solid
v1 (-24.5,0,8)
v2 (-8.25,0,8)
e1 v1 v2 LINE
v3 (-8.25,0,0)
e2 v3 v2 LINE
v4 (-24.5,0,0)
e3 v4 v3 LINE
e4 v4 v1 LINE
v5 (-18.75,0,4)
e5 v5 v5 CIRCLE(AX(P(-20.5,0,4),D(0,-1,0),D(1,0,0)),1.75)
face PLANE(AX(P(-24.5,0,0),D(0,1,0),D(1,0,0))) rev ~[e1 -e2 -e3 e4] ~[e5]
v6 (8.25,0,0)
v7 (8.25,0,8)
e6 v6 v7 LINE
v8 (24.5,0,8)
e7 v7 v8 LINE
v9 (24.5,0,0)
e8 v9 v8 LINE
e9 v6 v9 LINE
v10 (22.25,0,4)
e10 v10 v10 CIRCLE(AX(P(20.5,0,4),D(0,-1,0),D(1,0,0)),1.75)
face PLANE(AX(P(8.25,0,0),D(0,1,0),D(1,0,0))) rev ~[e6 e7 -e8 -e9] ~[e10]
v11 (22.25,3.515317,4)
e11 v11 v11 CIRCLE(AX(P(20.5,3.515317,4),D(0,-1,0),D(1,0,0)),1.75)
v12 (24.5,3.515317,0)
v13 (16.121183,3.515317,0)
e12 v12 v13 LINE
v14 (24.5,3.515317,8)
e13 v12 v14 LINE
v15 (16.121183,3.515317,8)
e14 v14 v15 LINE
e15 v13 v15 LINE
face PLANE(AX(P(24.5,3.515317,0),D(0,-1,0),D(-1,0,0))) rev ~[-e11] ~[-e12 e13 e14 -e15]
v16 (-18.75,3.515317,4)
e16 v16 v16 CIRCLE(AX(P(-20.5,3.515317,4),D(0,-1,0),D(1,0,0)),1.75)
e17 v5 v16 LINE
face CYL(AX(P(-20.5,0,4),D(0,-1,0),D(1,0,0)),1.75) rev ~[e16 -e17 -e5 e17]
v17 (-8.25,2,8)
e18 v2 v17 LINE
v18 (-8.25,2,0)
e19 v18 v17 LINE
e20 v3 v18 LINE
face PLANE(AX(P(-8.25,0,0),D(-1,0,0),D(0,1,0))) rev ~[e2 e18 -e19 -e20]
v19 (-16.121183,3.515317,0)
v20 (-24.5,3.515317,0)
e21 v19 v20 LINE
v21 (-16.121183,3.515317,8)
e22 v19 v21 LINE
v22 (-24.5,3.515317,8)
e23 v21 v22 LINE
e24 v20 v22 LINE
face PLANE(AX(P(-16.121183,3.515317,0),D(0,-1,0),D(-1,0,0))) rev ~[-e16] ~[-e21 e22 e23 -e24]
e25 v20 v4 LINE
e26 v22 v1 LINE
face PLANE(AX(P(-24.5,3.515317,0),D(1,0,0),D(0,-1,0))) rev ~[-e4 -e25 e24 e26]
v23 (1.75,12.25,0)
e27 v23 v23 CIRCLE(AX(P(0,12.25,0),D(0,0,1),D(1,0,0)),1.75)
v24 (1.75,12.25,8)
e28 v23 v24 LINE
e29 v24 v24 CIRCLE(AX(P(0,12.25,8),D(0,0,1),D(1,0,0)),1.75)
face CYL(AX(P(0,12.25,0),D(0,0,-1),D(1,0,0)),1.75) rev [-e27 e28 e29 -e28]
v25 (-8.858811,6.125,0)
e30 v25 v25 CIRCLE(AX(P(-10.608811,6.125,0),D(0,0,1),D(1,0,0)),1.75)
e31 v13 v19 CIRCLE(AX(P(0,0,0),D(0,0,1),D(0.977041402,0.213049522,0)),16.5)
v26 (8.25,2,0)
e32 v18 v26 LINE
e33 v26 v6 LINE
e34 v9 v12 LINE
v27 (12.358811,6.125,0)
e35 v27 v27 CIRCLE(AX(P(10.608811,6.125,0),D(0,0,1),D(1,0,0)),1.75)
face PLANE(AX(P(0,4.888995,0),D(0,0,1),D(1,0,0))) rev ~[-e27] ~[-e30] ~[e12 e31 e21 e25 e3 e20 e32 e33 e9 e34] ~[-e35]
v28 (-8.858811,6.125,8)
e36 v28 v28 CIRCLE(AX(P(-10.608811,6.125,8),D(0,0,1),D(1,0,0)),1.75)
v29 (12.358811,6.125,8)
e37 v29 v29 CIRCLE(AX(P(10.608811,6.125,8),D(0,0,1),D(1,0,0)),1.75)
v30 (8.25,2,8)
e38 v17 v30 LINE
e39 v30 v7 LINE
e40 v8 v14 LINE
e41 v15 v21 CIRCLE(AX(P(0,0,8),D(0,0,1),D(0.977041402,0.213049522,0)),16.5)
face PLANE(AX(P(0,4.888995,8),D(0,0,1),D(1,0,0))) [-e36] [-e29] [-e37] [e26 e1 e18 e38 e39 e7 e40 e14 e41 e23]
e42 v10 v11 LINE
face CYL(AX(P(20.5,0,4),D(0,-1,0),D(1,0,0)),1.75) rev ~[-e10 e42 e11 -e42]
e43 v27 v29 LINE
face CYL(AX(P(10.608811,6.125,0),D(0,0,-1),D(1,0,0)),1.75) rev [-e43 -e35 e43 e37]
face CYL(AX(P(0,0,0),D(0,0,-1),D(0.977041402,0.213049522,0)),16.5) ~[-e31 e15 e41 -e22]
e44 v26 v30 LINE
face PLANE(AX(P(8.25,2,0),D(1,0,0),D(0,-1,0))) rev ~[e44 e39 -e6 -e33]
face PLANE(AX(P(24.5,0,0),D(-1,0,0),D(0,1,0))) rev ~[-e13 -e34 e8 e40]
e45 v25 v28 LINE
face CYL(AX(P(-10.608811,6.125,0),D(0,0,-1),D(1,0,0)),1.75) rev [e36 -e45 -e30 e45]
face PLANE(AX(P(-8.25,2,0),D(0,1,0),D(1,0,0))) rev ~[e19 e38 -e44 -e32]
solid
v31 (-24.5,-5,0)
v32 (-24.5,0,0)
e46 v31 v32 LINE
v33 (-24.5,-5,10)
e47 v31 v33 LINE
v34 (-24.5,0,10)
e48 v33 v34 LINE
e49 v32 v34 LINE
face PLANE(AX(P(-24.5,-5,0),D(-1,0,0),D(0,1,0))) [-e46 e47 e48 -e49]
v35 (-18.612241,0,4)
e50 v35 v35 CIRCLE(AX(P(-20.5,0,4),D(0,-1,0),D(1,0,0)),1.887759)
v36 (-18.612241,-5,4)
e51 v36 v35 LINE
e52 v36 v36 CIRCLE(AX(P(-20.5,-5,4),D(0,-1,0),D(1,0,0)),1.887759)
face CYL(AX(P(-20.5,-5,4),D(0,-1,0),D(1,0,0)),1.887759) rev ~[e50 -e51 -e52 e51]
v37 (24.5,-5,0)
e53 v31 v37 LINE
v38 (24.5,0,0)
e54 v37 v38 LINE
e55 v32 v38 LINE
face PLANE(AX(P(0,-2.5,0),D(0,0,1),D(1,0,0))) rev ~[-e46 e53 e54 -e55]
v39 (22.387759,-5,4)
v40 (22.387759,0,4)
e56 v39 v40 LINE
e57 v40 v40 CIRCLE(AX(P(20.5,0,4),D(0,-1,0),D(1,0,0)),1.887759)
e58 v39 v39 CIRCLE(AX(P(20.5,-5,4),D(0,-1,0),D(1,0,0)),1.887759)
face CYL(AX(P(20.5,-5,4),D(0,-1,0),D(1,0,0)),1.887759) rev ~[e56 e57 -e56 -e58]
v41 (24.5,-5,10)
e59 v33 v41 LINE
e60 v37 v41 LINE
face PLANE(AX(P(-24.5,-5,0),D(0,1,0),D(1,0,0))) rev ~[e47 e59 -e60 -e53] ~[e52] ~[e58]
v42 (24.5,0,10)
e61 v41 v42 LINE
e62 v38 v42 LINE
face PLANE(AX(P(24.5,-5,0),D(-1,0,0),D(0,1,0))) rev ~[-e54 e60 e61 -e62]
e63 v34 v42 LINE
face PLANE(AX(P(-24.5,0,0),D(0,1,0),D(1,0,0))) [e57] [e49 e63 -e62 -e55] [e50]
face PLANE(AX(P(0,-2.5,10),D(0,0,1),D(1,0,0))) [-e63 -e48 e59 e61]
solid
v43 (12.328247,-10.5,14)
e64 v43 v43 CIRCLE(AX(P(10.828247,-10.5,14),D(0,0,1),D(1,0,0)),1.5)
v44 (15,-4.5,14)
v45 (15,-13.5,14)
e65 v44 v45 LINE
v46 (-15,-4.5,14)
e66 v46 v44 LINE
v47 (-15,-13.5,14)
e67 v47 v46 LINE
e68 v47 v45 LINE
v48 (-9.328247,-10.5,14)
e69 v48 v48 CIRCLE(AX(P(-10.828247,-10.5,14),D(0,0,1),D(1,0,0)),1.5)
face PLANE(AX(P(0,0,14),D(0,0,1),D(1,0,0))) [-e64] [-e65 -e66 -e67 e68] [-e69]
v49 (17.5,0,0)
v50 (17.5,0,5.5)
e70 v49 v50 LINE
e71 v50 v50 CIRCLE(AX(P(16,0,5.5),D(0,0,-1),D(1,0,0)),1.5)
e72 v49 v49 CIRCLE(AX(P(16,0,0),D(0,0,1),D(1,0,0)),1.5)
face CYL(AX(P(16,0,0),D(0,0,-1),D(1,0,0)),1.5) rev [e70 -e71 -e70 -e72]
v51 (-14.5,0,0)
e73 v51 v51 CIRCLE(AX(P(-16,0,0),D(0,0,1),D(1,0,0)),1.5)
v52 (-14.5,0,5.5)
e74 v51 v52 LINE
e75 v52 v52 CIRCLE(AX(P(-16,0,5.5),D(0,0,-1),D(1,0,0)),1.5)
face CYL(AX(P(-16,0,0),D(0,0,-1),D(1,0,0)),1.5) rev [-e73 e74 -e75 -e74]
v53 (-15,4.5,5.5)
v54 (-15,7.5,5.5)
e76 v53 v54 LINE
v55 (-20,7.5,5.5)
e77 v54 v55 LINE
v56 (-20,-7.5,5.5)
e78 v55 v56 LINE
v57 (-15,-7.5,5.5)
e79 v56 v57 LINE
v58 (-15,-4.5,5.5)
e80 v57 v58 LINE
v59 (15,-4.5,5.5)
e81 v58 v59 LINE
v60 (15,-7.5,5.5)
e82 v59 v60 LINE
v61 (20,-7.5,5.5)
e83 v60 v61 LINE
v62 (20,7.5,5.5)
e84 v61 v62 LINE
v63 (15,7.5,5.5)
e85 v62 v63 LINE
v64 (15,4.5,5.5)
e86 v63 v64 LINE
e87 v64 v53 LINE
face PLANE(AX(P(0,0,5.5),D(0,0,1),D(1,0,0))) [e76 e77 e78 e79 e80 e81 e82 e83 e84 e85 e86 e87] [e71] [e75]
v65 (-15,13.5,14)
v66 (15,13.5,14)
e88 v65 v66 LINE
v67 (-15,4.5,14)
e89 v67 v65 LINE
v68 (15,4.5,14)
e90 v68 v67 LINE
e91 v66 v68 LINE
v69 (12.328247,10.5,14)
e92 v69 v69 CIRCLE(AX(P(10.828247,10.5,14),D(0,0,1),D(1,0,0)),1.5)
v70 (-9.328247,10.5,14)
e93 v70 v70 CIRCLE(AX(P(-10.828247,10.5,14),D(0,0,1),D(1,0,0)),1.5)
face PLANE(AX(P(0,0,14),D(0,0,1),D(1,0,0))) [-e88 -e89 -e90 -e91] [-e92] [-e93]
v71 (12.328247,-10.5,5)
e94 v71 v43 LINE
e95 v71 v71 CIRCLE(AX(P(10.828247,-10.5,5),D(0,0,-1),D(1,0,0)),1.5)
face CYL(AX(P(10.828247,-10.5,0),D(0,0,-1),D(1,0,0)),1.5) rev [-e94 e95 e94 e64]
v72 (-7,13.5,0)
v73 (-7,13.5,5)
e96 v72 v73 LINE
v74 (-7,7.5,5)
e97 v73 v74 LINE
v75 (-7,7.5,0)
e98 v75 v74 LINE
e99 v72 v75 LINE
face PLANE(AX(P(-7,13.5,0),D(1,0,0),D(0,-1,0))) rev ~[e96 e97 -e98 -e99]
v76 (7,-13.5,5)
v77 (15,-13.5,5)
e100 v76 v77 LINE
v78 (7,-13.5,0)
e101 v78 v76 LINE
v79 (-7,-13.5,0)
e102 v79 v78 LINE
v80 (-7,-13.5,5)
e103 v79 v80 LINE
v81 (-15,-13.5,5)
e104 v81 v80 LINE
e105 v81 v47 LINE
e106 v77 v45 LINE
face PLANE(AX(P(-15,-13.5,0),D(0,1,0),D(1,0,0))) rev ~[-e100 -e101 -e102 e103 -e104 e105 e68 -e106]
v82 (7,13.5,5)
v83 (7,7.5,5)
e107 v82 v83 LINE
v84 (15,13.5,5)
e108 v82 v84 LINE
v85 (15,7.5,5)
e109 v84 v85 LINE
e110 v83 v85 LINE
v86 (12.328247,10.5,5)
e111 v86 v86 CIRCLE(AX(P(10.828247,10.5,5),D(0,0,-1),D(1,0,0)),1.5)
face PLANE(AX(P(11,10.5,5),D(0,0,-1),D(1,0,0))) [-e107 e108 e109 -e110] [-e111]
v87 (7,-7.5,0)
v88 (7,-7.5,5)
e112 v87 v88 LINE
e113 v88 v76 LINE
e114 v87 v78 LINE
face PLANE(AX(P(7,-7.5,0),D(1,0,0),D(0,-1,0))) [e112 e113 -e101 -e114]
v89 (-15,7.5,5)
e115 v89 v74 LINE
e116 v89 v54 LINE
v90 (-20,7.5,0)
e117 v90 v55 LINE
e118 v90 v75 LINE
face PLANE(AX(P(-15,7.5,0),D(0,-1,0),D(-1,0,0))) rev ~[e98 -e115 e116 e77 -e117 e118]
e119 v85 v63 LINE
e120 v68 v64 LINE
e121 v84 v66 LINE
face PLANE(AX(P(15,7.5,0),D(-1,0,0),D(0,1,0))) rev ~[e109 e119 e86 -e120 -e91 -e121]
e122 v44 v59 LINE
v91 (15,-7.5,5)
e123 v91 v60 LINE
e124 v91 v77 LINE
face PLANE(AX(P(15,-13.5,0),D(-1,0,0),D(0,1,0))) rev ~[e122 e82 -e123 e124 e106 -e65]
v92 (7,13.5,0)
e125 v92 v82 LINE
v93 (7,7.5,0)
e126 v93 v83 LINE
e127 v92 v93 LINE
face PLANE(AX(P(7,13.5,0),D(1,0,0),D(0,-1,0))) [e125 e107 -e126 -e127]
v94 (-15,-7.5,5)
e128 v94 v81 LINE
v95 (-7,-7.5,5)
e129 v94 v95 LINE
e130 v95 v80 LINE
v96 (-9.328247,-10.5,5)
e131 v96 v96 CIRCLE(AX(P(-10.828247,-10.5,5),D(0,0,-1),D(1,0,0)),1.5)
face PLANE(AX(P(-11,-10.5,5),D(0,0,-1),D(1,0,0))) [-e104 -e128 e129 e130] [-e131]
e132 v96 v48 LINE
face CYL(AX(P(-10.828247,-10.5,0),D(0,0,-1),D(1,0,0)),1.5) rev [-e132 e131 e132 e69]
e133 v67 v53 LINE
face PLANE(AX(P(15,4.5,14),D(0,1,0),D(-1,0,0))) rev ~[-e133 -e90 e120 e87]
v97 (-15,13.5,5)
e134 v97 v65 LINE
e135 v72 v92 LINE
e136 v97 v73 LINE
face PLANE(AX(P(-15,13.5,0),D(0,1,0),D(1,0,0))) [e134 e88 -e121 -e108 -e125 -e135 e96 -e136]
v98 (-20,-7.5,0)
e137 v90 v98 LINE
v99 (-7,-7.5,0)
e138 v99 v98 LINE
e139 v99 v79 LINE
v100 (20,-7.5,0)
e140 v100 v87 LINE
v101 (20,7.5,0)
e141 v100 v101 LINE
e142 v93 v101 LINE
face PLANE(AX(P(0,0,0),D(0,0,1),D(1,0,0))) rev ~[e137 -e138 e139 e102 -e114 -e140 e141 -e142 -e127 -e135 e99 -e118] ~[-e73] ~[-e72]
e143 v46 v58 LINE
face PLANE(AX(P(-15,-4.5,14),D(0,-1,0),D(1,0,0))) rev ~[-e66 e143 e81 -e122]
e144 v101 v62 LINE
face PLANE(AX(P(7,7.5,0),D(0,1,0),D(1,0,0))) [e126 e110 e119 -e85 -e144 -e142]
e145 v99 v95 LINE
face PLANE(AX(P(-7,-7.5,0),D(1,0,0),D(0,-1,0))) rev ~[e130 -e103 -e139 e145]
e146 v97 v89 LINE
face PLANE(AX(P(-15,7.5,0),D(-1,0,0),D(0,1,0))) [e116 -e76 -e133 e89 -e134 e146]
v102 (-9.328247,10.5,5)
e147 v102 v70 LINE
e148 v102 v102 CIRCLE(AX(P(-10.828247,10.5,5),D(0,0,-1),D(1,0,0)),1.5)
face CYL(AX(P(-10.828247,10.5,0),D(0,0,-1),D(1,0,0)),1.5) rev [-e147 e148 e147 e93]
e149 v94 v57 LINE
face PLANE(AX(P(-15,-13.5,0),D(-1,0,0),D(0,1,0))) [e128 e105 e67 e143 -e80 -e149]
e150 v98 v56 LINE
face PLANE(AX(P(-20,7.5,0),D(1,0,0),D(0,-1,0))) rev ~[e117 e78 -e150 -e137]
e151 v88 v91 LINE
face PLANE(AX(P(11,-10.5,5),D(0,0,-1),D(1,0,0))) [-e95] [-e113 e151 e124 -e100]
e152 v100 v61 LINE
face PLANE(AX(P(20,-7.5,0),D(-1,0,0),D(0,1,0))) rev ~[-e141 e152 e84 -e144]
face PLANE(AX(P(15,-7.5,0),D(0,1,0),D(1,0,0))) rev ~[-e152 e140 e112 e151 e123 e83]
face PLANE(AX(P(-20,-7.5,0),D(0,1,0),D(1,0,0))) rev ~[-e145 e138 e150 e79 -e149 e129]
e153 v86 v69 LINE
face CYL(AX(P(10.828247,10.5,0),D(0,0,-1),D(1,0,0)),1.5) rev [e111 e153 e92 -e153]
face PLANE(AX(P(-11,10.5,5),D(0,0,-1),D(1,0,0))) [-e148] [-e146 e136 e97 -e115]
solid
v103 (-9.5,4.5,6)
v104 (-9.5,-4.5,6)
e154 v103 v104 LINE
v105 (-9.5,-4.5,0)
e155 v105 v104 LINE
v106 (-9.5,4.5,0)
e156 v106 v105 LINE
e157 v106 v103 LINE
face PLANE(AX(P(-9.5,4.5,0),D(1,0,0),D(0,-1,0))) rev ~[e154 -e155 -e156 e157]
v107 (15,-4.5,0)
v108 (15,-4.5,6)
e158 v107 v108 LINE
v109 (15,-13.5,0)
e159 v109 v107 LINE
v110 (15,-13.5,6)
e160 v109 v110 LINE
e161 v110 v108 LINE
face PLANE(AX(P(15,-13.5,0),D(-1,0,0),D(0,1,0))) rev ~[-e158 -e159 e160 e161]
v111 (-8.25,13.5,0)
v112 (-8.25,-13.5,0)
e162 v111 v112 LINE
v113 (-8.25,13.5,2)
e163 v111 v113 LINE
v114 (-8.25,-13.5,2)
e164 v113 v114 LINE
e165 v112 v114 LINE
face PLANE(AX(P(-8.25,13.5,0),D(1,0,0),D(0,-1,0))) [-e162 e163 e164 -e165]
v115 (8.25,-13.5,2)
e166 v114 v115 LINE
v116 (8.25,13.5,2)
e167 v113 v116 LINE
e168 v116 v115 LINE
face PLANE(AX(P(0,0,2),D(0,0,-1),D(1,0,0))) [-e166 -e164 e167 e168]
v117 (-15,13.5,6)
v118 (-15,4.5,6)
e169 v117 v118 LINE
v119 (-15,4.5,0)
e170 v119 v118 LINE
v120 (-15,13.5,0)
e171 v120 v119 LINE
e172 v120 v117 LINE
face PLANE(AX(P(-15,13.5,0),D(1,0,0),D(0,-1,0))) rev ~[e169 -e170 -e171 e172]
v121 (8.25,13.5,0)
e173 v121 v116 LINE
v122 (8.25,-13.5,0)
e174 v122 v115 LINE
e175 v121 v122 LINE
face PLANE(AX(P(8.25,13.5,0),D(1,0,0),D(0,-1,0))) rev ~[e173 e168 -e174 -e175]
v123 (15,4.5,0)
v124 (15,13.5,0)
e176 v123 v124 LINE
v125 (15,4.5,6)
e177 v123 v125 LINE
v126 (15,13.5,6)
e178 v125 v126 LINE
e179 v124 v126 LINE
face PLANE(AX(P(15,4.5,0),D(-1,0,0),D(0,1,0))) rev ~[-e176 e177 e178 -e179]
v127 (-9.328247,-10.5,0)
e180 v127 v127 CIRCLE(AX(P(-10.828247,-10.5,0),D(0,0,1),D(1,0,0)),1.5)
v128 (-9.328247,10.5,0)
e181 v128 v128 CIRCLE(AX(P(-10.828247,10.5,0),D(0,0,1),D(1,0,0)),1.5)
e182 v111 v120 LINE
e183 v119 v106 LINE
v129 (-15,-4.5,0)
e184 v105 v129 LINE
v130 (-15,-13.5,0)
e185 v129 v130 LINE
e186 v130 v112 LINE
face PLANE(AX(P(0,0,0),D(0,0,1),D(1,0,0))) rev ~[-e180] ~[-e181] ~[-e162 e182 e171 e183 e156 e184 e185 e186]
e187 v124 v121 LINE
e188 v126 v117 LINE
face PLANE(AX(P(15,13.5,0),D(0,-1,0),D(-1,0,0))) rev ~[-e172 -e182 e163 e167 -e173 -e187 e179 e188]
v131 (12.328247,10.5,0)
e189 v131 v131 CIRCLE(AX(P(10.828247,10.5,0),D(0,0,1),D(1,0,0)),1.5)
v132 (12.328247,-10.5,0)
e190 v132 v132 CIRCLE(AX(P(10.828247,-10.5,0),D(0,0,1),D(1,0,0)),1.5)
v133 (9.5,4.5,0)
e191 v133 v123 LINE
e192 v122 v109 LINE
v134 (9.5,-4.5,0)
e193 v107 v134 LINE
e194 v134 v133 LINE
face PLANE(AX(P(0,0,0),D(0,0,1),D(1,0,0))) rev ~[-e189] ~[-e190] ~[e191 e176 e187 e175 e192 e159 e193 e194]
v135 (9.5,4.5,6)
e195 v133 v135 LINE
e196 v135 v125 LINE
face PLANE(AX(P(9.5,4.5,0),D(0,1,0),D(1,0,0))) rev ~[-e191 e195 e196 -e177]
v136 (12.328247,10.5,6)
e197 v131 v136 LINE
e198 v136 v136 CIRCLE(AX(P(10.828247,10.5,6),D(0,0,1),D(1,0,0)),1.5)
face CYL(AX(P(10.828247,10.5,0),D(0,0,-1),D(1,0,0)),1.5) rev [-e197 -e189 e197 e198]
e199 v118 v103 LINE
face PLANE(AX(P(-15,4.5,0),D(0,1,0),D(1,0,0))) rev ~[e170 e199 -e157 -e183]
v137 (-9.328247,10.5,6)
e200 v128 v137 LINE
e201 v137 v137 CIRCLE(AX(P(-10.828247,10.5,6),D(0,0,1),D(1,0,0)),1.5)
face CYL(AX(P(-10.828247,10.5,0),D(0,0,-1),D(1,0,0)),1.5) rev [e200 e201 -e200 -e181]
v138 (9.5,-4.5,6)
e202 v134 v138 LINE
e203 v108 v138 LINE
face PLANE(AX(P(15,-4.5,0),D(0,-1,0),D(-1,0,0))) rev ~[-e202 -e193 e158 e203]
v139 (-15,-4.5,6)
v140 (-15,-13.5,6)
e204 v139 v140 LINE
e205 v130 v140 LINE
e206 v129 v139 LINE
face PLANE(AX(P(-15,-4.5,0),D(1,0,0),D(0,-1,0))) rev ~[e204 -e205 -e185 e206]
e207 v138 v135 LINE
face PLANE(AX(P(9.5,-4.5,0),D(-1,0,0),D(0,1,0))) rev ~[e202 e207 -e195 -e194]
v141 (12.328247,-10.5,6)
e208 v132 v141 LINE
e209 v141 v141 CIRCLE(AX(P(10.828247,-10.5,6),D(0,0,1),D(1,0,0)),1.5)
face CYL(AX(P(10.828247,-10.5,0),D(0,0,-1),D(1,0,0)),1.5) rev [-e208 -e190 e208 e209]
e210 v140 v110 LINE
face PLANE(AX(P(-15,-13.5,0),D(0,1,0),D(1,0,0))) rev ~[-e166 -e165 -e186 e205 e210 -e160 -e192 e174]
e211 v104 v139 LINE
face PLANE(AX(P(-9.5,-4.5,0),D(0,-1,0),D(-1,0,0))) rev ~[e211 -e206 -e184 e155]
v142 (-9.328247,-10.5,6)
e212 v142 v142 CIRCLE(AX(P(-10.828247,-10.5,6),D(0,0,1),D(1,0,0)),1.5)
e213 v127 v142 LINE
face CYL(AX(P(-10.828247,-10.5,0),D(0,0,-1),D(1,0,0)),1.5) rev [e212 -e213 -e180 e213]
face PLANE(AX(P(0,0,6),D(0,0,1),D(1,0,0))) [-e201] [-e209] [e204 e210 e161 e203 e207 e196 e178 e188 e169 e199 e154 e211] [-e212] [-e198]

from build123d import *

# Parameters (mm, degrees)
F0_R      = 1.5
F0_W      = 30
F0_H      = 6
F1_DEPTH  = 14
F3_DEPTH  = 8.5
F4_R      = 1.5
F5_DEPTH  = 6
F6_W      = 16.5
F6_H      = 27
F7_DEPTH  = 2
F8_W      = 8
F8_H      = 6
F9_DEPTH  = 5
F10_R     = 1.75
F11_DEPTH = 8
F12_R     = 1.75
F13_DEPTH = 25
F14_W     = 49
F14_H     = 5
F15_DEPTH = 10
F16_R     = 1.8877590654
F17_DEPTH = 8


with BuildPart() as f1:
    # F0 (on Top) → F1 (new body)
    with BuildSketch(Plane.XY):
        Polygon((-15, 7.5), (-20, 7.5), (-20, -7.5), (-15, -7.5), (15, -7.5), (20, -7.5), (20, 7.5), (15, 7.5), align=None)
        with Locations((-16, 0)):
            Circle(F0_R, mode=Mode.SUBTRACT)
        with Locations((16, 0)):
            Circle(F0_R, mode=Mode.SUBTRACT)
        with Locations((0, 10.5)):
            Rectangle(F0_W, F0_H)
        with Locations((-10.828246883, 10.5)):
            Circle(F0_R, mode=Mode.SUBTRACT)
        with Locations((10.828246883, 10.5)):
            Circle(F0_R, mode=Mode.SUBTRACT)
        with Locations((0, -10.5)):
            Rectangle(F0_W, F0_H)
        with Locations((-10.828246883, -10.5)):
            Circle(F0_R, mode=Mode.SUBTRACT)
        with Locations((10.828246883, -10.5)):
            Circle(F0_R, mode=Mode.SUBTRACT)
    extrude(amount=F1_DEPTH)

    # F2 (on face) → F3 (cut)
    with BuildSketch(Plane.XY.offset(14)):
        Polygon((15, 4.5), (-15, 4.5), (-15, 7.5), (-20, 7.5), (-20, 4.5), (-20, -4.5), (-20, -7.5), (-15, -7.5), (-15, -4.5), (15, -4.5), (15, -7.5), (20, -7.5), (20, -4.5), (20, 4.5), (20, 7.5), (15, 7.5), align=None)
    extrude(amount=-F3_DEPTH, mode=Mode.SUBTRACT)

    # F8 (on face) → F9 (cut)
    with BuildSketch(Plane(origin=(0, 0, 0), x_dir=(1, 0, 0), z_dir=(0, 0, -1))):
        with Locations((-11, 10.5)):
            Rectangle(F8_W, F8_H)
        with Locations((11, 10.5)):
            Rectangle(F8_W, F8_H)
        with Locations((-11, -10.5)):
            Rectangle(F8_W, F8_H)
        with Locations((11, -10.5)):
            Rectangle(F8_W, F8_H)
    extrude(amount=-F9_DEPTH, mode=Mode.SUBTRACT)


with BuildPart() as f5:
    # F4 (on Top) → F5 (new body)
    with BuildSketch(Plane.XY):
        Polygon((15, 13.5), (-15, 13.5), (-15, 4.5), (-9.5, 4.5), (-9.5, -4.5), (-15, -4.5), (-15, -13.5), (15, -13.5), (15, -4.5), (9.5, -4.5), (9.5, 4.5), (15, 4.5), align=None)
        with Locations((-10.828246883, -10.5)):
            Circle(F4_R, mode=Mode.SUBTRACT)
        with Locations((10.828246883, -10.5)):
            Circle(F4_R, mode=Mode.SUBTRACT)
        with Locations((-10.828246883, 10.5)):
            Circle(F4_R, mode=Mode.SUBTRACT)
        with Locations((10.828246883, 10.5)):
            Circle(F4_R, mode=Mode.SUBTRACT)
    extrude(amount=F5_DEPTH)

    # F6 (on face) → F7 (cut)
    with BuildSketch(Plane(origin=(0, 0, 0), x_dir=(1, 0, 0), z_dir=(0, 0, -1))):
        Rectangle(F6_W, F6_H)
    extrude(amount=-F7_DEPTH, mode=Mode.SUBTRACT)


with BuildPart() as f11:
    # F10 (on Top) → F11 (new body)
    with BuildSketch(Plane.XY):
        with BuildLine():
            Line((-24.5, 0), (-16.5, 0))
            Line((-16.5, 0), (-8.25, 0))
            Line((-8.25, 0), (-8.25, 2))
            Line((-8.25, 2), (8.25, 2))
            Line((8.25, 2), (8.25, 0))
            Line((8.25, 0), (16.5, 0))
            Line((16.5, 0), (24.5, 0))
            Line((24.5, 0), (24.5, 3.5153171048))
            Line((24.5, 3.5153171048), (16.1211831344, 3.5153171048))
            ThreePointArc((16.1211831344, 3.5153171048), (0, 16.5), (-16.1211831344, 3.5153171048))
            Line((-16.1211831344, 3.5153171048), (-24.5, 3.5153171048))
            Line((-24.5, 3.5153171048), (-24.5, 0))
        make_face()
        with Locations((-10.6088111964, 6.125)):
            Circle(F10_R, mode=Mode.SUBTRACT)
        with Locations((10.6088111964, 6.125)):
            Circle(F10_R, mode=Mode.SUBTRACT)
        with Locations((0, 12.25)):
            Circle(F10_R, mode=Mode.SUBTRACT)
    extrude(amount=F11_DEPTH)

    # F12 (on face) → F13 (cut)
    with BuildSketch(Plane.XZ):
        with Locations((-20.5, 4)):
            Circle(F12_R)
        with Locations((20.5, 4)):
            Circle(F12_R)
    extrude(amount=-F13_DEPTH, mode=Mode.SUBTRACT)


with BuildPart() as f15:
    # F14 (on Top) → F15 (new body)
    with BuildSketch(Plane.XY):
        with Locations((0, -2.5)):
            Rectangle(F14_W, F14_H)
    extrude(amount=F15_DEPTH)

    # F16 (on face) → F17 (cut)
    with BuildSketch(Plane.XZ.offset(5)):
        with Locations((-20.5, 4)):
            Circle(F16_R)
        with Locations((20.5, 4)):
            Circle(F16_R)
    extrude(amount=-F17_DEPTH, mode=Mode.SUBTRACT)


solid = Compound([f1.part, f5.part, f11.part, f15.part])
